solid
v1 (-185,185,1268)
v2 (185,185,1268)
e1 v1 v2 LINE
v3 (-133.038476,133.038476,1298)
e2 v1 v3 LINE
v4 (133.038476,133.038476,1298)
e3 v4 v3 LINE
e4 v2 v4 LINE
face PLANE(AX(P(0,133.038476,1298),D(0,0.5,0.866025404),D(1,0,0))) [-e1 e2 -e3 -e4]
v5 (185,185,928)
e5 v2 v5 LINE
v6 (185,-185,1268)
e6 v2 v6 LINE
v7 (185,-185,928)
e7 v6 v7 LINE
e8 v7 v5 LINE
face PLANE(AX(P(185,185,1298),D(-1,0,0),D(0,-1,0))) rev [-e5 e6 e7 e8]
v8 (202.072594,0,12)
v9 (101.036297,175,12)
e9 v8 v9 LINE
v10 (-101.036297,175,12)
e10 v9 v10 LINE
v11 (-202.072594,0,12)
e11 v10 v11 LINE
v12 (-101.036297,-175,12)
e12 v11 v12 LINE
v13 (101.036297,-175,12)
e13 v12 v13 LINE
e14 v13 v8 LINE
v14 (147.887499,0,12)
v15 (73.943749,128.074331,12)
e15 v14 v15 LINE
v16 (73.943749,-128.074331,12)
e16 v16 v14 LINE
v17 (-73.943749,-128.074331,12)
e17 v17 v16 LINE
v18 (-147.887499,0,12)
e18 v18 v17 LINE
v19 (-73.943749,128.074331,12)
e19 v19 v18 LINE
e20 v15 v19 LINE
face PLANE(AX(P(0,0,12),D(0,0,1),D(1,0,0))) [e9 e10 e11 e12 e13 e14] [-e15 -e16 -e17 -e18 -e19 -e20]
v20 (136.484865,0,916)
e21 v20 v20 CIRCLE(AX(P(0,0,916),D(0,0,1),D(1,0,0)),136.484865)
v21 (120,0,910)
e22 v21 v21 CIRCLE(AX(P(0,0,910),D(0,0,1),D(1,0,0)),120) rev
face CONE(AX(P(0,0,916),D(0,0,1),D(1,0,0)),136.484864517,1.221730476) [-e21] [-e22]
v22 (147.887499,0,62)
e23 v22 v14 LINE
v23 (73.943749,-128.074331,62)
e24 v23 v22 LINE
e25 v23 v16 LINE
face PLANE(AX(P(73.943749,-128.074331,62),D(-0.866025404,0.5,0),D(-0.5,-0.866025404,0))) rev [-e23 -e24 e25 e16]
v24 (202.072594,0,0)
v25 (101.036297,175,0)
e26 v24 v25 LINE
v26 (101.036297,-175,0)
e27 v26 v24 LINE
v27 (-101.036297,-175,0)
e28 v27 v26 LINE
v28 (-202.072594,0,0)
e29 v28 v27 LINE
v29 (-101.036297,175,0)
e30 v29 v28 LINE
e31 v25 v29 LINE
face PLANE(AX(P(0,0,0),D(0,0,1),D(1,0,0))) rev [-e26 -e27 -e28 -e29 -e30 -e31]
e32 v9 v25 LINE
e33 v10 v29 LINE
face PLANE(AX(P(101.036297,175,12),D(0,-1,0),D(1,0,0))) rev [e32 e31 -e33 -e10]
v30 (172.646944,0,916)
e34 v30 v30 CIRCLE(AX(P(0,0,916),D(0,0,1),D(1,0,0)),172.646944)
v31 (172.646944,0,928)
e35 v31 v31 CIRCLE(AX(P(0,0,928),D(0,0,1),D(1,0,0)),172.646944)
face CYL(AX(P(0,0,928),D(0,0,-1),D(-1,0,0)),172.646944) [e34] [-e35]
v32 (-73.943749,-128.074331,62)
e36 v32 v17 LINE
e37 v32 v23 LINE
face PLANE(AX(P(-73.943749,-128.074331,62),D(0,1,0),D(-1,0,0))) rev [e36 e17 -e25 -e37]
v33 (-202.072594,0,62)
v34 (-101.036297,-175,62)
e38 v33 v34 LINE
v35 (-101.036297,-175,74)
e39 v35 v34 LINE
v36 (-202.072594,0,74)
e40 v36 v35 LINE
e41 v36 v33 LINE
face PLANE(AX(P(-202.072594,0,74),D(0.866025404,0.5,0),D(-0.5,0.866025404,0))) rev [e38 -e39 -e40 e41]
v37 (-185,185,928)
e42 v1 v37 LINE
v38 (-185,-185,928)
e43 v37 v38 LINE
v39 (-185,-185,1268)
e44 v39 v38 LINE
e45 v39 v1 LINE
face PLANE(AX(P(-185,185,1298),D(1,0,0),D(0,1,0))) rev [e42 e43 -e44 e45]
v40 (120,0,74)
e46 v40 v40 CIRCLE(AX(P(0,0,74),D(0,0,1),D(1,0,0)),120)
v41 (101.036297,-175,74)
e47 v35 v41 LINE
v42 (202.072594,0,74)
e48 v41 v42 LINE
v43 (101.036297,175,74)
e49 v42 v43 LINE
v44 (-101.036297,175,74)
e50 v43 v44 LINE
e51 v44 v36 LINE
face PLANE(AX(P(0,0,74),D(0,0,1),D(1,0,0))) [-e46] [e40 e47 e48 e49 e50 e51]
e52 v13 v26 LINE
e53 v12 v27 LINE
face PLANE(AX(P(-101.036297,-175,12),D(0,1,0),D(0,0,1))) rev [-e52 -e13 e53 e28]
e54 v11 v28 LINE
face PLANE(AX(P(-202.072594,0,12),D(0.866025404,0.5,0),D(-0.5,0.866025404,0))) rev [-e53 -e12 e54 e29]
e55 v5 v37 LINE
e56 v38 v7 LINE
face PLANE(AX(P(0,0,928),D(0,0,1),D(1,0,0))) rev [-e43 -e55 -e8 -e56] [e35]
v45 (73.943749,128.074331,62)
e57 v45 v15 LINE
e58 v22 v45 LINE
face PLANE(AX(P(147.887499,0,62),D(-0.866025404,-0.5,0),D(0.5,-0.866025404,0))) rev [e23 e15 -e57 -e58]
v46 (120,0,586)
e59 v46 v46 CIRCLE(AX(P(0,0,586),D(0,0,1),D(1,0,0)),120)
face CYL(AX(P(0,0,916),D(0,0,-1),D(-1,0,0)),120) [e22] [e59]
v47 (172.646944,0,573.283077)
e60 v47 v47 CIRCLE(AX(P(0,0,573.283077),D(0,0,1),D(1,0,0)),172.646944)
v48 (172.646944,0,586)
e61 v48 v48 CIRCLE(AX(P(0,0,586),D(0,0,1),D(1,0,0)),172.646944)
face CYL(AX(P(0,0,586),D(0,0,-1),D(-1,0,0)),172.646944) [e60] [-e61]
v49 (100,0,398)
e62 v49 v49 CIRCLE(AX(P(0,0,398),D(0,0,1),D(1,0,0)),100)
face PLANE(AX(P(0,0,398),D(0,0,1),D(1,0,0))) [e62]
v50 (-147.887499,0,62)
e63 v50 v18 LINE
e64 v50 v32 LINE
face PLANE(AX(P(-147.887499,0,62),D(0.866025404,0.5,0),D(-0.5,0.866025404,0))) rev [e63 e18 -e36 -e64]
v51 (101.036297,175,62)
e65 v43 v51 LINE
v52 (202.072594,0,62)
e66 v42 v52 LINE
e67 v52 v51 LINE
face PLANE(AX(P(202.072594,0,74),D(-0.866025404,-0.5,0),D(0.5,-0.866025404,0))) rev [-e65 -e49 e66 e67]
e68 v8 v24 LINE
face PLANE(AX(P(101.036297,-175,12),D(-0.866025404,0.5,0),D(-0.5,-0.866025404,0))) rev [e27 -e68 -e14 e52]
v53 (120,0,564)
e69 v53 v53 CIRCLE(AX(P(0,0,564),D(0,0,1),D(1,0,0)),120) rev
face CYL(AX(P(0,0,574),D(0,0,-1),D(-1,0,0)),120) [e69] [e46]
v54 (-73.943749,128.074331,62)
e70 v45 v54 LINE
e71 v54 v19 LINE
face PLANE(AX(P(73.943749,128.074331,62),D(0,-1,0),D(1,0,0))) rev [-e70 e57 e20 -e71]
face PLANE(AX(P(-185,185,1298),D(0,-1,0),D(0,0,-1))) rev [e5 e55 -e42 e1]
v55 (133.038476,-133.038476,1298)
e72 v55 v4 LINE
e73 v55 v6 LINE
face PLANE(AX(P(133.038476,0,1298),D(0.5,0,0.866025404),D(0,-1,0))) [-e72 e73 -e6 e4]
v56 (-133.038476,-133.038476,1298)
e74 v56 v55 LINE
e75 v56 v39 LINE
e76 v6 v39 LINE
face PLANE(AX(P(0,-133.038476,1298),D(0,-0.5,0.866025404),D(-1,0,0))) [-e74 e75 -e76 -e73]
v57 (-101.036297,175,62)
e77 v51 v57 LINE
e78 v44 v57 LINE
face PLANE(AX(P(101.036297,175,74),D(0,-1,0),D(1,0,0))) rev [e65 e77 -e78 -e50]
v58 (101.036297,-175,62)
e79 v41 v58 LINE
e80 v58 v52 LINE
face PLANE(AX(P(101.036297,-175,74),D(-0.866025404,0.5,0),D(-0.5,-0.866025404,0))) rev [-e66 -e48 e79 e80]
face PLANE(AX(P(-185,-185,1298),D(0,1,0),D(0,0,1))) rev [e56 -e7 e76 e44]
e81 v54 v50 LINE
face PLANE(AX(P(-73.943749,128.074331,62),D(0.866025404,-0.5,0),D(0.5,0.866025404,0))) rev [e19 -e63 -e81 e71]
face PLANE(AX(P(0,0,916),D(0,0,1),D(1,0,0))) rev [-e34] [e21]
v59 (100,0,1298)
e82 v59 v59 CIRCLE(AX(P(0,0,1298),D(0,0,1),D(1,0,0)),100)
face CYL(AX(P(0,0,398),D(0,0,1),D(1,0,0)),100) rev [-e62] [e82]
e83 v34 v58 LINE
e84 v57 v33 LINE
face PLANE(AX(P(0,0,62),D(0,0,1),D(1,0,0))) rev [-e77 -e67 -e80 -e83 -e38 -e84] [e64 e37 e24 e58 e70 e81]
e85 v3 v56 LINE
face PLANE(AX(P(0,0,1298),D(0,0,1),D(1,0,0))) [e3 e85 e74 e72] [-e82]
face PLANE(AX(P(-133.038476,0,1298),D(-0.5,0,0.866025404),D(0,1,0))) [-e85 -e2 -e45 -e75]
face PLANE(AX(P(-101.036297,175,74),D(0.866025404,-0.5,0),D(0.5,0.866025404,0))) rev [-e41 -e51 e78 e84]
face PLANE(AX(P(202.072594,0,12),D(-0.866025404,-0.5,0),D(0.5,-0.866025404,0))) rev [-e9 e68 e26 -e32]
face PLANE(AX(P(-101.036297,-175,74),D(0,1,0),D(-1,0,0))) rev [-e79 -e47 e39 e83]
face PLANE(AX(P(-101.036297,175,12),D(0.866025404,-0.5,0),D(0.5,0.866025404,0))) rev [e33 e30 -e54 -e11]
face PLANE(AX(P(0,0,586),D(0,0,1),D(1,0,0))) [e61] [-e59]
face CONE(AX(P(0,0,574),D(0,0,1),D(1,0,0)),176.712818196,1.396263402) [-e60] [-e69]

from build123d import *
from OCP.BRepFilletAPI import BRepFilletAPI_MakeChamfer

# Parameters (mm, degrees)
BOSS_EXTRUDE1_DEPTH = 12
BOSS_EXTRUDE2_DEPTH = 50
BOSS_EXTRUDE3_DEPTH = 12
SKETCH4_R           = 120
BOSS_EXTRUDE4_DEPTH = 500
SKETCH5_R           = 172.646944325
BOSS_EXTRUDE5_DEPTH = 12
CHAMFER1_SIZE       = 56.712818196
CHAMFER1_SIZE_2     = 10
SKETCH6_R           = 120
BOSS_EXTRUDE6_DEPTH = 330
SKETCH8_R           = 172.646944325
BOSS_EXTRUDE7_DEPTH = 12
CHAMFER2_SIZE       = 6
CHAMFER2_SIZE2      = 16.484864517
SKETCH9_W           = 370
SKETCH9_H           = 370
BOSS_EXTRUDE8_DEPTH = 370
SKETCH10_R          = 100
CUT_EXTRUDE1_DEPTH  = 900
CHAMFER3_SIZE       = 30
CHAMFER3_SIZE2      = 51.961524227


with BuildPart() as part:
    # Sketch1 → Boss-Extrude1 (new body)
    with BuildSketch(Plane.XY):
        Polygon((202.072594216, 0), (101.036297108, 175), (-101.036297108, 175), (-202.072594216, 0), (-101.036297108, -175), (101.036297108, -175), align=None)
    extrude(amount=BOSS_EXTRUDE1_DEPTH)

    # Sketch2 → Boss-Extrude2 (add)
    with BuildSketch(Plane.XY.offset(12)):
        Polygon((147.887498821, 0), (73.943749411, 128.074330881), (-73.943749411, 128.074330881), (-147.887498821, 0), (-73.943749411, -128.074330881), (73.943749411, -128.074330881), align=None)
    extrude(amount=BOSS_EXTRUDE2_DEPTH)

    # Sketch3 → Boss-Extrude3 (add)
    with BuildSketch(Plane.XY.offset(62)):
        Polygon((202.072594216, 0), (101.036297108, 175), (-101.036297108, 175), (-202.072594216, 0), (-101.036297108, -175), (101.036297108, -175), align=None)
    extrude(amount=BOSS_EXTRUDE3_DEPTH)

    # Sketch4 → Boss-Extrude4 (add)
    with BuildSketch(Plane.XY.offset(74)):
        Circle(SKETCH4_R)
    extrude(amount=BOSS_EXTRUDE4_DEPTH)

    # Sketch5 → Boss-Extrude5 (add)
    with BuildSketch(Plane.XY.offset(574)):
        Circle(SKETCH5_R)
    extrude(amount=BOSS_EXTRUDE5_DEPTH)

    # Chamfer1
    # the kernel refuses this chamfer: 56.712818196, 10 mm, written as the material it adds along each edge
    with BuildSketch(Plane(origin=(0, 0, 574), x_dir=(1, 0, 0), z_dir=(0, -1, 0))) as chamfer1_piece_1_section:
        Polygon((120 + CHAMFER1_SIZE, 0), (120, -CHAMFER1_SIZE_2), (120, 0), align=None)
    chamfer1_piece_1 = revolve(axis=Axis((0, 0, 574), (0, 0, 1)), mode=Mode.PRIVATE)
    chamfer1_piece_1 = chamfer1_piece_1 & Plane(origin=(0, 0, 569.114385433), x_dir=(1, 0, 0), z_dir=(0, 0, -1)) * Cylinder(172.646944325, 707, mode=Mode.PRIVATE)
    add(chamfer1_piece_1)

    # Sketch6 → Boss-Extrude6 (add)
    with BuildSketch(Plane.XY.offset(586)):
        Circle(SKETCH6_R)
    extrude(amount=BOSS_EXTRUDE6_DEPTH)

    # Sketch8 → Boss-Extrude7 (add)
    with BuildSketch(Plane.XY.offset(916)):
        Circle(SKETCH8_R)
    extrude(amount=BOSS_EXTRUDE7_DEPTH)

    # Chamfer2
    chamfer2_edges = [part.edges().sort_by_distance(p)[0] for p in [
        (-120, 0, 916),
    ]]
    chamfer2_side = [part.faces().sort_by_distance(p)[0] for p in [
        (-120, 0, 751),
    ]]
    chamfer(chamfer2_edges, length=CHAMFER2_SIZE, length2=CHAMFER2_SIZE2, reference=chamfer2_side[0])

    # Sketch9 → Boss-Extrude8 (add)
    with BuildSketch(Plane.XY.offset(928)):
        Rectangle(SKETCH9_W, SKETCH9_H)
    extrude(amount=BOSS_EXTRUDE8_DEPTH)

    # Sketch10 → Cut-Extrude1 (cut)
    with BuildSketch(Plane.XY.offset(1298)):
        Circle(SKETCH10_R)
    extrude(amount=-CUT_EXTRUDE1_DEPTH, mode=Mode.SUBTRACT)

    # Chamfer3: one chamfer whose edges measure the first distance from different faces: ONE call of the kernel's chamfer builder (chamfer() names one face for all edges)
    chamfer3_edges_1 = [part.edges().sort_by_distance(p)[0] for p in [
        (185, 0, 1298),
    ]]
    chamfer3_side_1 = [part.faces().sort_by_distance(p)[0] for p in [
        (185, 0, 1113),
    ]]
    chamfer3_edges_2 = [part.edges().sort_by_distance(p)[0] for p in [
        (0, 185, 1298),
    ]]
    chamfer3_side_2 = [part.faces().sort_by_distance(p)[0] for p in [
        (0, 185, 1113),
    ]]
    chamfer3_edges_3 = [part.edges().sort_by_distance(p)[0] for p in [
        (-185, 0, 1298),
    ]]
    chamfer3_side_3 = [part.faces().sort_by_distance(p)[0] for p in [
        (-185, 0, 1113),
    ]]
    chamfer3_edges_4 = [part.edges().sort_by_distance(p)[0] for p in [
        (0, -185, 1298),
    ]]
    chamfer3_side_4 = [part.faces().sort_by_distance(p)[0] for p in [
        (0, -185, 1113),
    ]]
    chamfer3 = BRepFilletAPI_MakeChamfer(part.part.solid().wrapped)
    for e in chamfer3_edges_1:
        chamfer3.Add(CHAMFER3_SIZE, CHAMFER3_SIZE2, e.wrapped, chamfer3_side_1[0].wrapped)  # the first distance lies on this face
    for e in chamfer3_edges_2:
        chamfer3.Add(CHAMFER3_SIZE, CHAMFER3_SIZE2, e.wrapped, chamfer3_side_2[0].wrapped)  # the first distance lies on this face
    for e in chamfer3_edges_3:
        chamfer3.Add(CHAMFER3_SIZE, CHAMFER3_SIZE2, e.wrapped, chamfer3_side_3[0].wrapped)  # the first distance lies on this face
    for e in chamfer3_edges_4:
        chamfer3.Add(CHAMFER3_SIZE, CHAMFER3_SIZE2, e.wrapped, chamfer3_side_4[0].wrapped)  # the first distance lies on this face
    add(Compound.cast(chamfer3.Shape()), mode=Mode.REPLACE)


solid = part.part
